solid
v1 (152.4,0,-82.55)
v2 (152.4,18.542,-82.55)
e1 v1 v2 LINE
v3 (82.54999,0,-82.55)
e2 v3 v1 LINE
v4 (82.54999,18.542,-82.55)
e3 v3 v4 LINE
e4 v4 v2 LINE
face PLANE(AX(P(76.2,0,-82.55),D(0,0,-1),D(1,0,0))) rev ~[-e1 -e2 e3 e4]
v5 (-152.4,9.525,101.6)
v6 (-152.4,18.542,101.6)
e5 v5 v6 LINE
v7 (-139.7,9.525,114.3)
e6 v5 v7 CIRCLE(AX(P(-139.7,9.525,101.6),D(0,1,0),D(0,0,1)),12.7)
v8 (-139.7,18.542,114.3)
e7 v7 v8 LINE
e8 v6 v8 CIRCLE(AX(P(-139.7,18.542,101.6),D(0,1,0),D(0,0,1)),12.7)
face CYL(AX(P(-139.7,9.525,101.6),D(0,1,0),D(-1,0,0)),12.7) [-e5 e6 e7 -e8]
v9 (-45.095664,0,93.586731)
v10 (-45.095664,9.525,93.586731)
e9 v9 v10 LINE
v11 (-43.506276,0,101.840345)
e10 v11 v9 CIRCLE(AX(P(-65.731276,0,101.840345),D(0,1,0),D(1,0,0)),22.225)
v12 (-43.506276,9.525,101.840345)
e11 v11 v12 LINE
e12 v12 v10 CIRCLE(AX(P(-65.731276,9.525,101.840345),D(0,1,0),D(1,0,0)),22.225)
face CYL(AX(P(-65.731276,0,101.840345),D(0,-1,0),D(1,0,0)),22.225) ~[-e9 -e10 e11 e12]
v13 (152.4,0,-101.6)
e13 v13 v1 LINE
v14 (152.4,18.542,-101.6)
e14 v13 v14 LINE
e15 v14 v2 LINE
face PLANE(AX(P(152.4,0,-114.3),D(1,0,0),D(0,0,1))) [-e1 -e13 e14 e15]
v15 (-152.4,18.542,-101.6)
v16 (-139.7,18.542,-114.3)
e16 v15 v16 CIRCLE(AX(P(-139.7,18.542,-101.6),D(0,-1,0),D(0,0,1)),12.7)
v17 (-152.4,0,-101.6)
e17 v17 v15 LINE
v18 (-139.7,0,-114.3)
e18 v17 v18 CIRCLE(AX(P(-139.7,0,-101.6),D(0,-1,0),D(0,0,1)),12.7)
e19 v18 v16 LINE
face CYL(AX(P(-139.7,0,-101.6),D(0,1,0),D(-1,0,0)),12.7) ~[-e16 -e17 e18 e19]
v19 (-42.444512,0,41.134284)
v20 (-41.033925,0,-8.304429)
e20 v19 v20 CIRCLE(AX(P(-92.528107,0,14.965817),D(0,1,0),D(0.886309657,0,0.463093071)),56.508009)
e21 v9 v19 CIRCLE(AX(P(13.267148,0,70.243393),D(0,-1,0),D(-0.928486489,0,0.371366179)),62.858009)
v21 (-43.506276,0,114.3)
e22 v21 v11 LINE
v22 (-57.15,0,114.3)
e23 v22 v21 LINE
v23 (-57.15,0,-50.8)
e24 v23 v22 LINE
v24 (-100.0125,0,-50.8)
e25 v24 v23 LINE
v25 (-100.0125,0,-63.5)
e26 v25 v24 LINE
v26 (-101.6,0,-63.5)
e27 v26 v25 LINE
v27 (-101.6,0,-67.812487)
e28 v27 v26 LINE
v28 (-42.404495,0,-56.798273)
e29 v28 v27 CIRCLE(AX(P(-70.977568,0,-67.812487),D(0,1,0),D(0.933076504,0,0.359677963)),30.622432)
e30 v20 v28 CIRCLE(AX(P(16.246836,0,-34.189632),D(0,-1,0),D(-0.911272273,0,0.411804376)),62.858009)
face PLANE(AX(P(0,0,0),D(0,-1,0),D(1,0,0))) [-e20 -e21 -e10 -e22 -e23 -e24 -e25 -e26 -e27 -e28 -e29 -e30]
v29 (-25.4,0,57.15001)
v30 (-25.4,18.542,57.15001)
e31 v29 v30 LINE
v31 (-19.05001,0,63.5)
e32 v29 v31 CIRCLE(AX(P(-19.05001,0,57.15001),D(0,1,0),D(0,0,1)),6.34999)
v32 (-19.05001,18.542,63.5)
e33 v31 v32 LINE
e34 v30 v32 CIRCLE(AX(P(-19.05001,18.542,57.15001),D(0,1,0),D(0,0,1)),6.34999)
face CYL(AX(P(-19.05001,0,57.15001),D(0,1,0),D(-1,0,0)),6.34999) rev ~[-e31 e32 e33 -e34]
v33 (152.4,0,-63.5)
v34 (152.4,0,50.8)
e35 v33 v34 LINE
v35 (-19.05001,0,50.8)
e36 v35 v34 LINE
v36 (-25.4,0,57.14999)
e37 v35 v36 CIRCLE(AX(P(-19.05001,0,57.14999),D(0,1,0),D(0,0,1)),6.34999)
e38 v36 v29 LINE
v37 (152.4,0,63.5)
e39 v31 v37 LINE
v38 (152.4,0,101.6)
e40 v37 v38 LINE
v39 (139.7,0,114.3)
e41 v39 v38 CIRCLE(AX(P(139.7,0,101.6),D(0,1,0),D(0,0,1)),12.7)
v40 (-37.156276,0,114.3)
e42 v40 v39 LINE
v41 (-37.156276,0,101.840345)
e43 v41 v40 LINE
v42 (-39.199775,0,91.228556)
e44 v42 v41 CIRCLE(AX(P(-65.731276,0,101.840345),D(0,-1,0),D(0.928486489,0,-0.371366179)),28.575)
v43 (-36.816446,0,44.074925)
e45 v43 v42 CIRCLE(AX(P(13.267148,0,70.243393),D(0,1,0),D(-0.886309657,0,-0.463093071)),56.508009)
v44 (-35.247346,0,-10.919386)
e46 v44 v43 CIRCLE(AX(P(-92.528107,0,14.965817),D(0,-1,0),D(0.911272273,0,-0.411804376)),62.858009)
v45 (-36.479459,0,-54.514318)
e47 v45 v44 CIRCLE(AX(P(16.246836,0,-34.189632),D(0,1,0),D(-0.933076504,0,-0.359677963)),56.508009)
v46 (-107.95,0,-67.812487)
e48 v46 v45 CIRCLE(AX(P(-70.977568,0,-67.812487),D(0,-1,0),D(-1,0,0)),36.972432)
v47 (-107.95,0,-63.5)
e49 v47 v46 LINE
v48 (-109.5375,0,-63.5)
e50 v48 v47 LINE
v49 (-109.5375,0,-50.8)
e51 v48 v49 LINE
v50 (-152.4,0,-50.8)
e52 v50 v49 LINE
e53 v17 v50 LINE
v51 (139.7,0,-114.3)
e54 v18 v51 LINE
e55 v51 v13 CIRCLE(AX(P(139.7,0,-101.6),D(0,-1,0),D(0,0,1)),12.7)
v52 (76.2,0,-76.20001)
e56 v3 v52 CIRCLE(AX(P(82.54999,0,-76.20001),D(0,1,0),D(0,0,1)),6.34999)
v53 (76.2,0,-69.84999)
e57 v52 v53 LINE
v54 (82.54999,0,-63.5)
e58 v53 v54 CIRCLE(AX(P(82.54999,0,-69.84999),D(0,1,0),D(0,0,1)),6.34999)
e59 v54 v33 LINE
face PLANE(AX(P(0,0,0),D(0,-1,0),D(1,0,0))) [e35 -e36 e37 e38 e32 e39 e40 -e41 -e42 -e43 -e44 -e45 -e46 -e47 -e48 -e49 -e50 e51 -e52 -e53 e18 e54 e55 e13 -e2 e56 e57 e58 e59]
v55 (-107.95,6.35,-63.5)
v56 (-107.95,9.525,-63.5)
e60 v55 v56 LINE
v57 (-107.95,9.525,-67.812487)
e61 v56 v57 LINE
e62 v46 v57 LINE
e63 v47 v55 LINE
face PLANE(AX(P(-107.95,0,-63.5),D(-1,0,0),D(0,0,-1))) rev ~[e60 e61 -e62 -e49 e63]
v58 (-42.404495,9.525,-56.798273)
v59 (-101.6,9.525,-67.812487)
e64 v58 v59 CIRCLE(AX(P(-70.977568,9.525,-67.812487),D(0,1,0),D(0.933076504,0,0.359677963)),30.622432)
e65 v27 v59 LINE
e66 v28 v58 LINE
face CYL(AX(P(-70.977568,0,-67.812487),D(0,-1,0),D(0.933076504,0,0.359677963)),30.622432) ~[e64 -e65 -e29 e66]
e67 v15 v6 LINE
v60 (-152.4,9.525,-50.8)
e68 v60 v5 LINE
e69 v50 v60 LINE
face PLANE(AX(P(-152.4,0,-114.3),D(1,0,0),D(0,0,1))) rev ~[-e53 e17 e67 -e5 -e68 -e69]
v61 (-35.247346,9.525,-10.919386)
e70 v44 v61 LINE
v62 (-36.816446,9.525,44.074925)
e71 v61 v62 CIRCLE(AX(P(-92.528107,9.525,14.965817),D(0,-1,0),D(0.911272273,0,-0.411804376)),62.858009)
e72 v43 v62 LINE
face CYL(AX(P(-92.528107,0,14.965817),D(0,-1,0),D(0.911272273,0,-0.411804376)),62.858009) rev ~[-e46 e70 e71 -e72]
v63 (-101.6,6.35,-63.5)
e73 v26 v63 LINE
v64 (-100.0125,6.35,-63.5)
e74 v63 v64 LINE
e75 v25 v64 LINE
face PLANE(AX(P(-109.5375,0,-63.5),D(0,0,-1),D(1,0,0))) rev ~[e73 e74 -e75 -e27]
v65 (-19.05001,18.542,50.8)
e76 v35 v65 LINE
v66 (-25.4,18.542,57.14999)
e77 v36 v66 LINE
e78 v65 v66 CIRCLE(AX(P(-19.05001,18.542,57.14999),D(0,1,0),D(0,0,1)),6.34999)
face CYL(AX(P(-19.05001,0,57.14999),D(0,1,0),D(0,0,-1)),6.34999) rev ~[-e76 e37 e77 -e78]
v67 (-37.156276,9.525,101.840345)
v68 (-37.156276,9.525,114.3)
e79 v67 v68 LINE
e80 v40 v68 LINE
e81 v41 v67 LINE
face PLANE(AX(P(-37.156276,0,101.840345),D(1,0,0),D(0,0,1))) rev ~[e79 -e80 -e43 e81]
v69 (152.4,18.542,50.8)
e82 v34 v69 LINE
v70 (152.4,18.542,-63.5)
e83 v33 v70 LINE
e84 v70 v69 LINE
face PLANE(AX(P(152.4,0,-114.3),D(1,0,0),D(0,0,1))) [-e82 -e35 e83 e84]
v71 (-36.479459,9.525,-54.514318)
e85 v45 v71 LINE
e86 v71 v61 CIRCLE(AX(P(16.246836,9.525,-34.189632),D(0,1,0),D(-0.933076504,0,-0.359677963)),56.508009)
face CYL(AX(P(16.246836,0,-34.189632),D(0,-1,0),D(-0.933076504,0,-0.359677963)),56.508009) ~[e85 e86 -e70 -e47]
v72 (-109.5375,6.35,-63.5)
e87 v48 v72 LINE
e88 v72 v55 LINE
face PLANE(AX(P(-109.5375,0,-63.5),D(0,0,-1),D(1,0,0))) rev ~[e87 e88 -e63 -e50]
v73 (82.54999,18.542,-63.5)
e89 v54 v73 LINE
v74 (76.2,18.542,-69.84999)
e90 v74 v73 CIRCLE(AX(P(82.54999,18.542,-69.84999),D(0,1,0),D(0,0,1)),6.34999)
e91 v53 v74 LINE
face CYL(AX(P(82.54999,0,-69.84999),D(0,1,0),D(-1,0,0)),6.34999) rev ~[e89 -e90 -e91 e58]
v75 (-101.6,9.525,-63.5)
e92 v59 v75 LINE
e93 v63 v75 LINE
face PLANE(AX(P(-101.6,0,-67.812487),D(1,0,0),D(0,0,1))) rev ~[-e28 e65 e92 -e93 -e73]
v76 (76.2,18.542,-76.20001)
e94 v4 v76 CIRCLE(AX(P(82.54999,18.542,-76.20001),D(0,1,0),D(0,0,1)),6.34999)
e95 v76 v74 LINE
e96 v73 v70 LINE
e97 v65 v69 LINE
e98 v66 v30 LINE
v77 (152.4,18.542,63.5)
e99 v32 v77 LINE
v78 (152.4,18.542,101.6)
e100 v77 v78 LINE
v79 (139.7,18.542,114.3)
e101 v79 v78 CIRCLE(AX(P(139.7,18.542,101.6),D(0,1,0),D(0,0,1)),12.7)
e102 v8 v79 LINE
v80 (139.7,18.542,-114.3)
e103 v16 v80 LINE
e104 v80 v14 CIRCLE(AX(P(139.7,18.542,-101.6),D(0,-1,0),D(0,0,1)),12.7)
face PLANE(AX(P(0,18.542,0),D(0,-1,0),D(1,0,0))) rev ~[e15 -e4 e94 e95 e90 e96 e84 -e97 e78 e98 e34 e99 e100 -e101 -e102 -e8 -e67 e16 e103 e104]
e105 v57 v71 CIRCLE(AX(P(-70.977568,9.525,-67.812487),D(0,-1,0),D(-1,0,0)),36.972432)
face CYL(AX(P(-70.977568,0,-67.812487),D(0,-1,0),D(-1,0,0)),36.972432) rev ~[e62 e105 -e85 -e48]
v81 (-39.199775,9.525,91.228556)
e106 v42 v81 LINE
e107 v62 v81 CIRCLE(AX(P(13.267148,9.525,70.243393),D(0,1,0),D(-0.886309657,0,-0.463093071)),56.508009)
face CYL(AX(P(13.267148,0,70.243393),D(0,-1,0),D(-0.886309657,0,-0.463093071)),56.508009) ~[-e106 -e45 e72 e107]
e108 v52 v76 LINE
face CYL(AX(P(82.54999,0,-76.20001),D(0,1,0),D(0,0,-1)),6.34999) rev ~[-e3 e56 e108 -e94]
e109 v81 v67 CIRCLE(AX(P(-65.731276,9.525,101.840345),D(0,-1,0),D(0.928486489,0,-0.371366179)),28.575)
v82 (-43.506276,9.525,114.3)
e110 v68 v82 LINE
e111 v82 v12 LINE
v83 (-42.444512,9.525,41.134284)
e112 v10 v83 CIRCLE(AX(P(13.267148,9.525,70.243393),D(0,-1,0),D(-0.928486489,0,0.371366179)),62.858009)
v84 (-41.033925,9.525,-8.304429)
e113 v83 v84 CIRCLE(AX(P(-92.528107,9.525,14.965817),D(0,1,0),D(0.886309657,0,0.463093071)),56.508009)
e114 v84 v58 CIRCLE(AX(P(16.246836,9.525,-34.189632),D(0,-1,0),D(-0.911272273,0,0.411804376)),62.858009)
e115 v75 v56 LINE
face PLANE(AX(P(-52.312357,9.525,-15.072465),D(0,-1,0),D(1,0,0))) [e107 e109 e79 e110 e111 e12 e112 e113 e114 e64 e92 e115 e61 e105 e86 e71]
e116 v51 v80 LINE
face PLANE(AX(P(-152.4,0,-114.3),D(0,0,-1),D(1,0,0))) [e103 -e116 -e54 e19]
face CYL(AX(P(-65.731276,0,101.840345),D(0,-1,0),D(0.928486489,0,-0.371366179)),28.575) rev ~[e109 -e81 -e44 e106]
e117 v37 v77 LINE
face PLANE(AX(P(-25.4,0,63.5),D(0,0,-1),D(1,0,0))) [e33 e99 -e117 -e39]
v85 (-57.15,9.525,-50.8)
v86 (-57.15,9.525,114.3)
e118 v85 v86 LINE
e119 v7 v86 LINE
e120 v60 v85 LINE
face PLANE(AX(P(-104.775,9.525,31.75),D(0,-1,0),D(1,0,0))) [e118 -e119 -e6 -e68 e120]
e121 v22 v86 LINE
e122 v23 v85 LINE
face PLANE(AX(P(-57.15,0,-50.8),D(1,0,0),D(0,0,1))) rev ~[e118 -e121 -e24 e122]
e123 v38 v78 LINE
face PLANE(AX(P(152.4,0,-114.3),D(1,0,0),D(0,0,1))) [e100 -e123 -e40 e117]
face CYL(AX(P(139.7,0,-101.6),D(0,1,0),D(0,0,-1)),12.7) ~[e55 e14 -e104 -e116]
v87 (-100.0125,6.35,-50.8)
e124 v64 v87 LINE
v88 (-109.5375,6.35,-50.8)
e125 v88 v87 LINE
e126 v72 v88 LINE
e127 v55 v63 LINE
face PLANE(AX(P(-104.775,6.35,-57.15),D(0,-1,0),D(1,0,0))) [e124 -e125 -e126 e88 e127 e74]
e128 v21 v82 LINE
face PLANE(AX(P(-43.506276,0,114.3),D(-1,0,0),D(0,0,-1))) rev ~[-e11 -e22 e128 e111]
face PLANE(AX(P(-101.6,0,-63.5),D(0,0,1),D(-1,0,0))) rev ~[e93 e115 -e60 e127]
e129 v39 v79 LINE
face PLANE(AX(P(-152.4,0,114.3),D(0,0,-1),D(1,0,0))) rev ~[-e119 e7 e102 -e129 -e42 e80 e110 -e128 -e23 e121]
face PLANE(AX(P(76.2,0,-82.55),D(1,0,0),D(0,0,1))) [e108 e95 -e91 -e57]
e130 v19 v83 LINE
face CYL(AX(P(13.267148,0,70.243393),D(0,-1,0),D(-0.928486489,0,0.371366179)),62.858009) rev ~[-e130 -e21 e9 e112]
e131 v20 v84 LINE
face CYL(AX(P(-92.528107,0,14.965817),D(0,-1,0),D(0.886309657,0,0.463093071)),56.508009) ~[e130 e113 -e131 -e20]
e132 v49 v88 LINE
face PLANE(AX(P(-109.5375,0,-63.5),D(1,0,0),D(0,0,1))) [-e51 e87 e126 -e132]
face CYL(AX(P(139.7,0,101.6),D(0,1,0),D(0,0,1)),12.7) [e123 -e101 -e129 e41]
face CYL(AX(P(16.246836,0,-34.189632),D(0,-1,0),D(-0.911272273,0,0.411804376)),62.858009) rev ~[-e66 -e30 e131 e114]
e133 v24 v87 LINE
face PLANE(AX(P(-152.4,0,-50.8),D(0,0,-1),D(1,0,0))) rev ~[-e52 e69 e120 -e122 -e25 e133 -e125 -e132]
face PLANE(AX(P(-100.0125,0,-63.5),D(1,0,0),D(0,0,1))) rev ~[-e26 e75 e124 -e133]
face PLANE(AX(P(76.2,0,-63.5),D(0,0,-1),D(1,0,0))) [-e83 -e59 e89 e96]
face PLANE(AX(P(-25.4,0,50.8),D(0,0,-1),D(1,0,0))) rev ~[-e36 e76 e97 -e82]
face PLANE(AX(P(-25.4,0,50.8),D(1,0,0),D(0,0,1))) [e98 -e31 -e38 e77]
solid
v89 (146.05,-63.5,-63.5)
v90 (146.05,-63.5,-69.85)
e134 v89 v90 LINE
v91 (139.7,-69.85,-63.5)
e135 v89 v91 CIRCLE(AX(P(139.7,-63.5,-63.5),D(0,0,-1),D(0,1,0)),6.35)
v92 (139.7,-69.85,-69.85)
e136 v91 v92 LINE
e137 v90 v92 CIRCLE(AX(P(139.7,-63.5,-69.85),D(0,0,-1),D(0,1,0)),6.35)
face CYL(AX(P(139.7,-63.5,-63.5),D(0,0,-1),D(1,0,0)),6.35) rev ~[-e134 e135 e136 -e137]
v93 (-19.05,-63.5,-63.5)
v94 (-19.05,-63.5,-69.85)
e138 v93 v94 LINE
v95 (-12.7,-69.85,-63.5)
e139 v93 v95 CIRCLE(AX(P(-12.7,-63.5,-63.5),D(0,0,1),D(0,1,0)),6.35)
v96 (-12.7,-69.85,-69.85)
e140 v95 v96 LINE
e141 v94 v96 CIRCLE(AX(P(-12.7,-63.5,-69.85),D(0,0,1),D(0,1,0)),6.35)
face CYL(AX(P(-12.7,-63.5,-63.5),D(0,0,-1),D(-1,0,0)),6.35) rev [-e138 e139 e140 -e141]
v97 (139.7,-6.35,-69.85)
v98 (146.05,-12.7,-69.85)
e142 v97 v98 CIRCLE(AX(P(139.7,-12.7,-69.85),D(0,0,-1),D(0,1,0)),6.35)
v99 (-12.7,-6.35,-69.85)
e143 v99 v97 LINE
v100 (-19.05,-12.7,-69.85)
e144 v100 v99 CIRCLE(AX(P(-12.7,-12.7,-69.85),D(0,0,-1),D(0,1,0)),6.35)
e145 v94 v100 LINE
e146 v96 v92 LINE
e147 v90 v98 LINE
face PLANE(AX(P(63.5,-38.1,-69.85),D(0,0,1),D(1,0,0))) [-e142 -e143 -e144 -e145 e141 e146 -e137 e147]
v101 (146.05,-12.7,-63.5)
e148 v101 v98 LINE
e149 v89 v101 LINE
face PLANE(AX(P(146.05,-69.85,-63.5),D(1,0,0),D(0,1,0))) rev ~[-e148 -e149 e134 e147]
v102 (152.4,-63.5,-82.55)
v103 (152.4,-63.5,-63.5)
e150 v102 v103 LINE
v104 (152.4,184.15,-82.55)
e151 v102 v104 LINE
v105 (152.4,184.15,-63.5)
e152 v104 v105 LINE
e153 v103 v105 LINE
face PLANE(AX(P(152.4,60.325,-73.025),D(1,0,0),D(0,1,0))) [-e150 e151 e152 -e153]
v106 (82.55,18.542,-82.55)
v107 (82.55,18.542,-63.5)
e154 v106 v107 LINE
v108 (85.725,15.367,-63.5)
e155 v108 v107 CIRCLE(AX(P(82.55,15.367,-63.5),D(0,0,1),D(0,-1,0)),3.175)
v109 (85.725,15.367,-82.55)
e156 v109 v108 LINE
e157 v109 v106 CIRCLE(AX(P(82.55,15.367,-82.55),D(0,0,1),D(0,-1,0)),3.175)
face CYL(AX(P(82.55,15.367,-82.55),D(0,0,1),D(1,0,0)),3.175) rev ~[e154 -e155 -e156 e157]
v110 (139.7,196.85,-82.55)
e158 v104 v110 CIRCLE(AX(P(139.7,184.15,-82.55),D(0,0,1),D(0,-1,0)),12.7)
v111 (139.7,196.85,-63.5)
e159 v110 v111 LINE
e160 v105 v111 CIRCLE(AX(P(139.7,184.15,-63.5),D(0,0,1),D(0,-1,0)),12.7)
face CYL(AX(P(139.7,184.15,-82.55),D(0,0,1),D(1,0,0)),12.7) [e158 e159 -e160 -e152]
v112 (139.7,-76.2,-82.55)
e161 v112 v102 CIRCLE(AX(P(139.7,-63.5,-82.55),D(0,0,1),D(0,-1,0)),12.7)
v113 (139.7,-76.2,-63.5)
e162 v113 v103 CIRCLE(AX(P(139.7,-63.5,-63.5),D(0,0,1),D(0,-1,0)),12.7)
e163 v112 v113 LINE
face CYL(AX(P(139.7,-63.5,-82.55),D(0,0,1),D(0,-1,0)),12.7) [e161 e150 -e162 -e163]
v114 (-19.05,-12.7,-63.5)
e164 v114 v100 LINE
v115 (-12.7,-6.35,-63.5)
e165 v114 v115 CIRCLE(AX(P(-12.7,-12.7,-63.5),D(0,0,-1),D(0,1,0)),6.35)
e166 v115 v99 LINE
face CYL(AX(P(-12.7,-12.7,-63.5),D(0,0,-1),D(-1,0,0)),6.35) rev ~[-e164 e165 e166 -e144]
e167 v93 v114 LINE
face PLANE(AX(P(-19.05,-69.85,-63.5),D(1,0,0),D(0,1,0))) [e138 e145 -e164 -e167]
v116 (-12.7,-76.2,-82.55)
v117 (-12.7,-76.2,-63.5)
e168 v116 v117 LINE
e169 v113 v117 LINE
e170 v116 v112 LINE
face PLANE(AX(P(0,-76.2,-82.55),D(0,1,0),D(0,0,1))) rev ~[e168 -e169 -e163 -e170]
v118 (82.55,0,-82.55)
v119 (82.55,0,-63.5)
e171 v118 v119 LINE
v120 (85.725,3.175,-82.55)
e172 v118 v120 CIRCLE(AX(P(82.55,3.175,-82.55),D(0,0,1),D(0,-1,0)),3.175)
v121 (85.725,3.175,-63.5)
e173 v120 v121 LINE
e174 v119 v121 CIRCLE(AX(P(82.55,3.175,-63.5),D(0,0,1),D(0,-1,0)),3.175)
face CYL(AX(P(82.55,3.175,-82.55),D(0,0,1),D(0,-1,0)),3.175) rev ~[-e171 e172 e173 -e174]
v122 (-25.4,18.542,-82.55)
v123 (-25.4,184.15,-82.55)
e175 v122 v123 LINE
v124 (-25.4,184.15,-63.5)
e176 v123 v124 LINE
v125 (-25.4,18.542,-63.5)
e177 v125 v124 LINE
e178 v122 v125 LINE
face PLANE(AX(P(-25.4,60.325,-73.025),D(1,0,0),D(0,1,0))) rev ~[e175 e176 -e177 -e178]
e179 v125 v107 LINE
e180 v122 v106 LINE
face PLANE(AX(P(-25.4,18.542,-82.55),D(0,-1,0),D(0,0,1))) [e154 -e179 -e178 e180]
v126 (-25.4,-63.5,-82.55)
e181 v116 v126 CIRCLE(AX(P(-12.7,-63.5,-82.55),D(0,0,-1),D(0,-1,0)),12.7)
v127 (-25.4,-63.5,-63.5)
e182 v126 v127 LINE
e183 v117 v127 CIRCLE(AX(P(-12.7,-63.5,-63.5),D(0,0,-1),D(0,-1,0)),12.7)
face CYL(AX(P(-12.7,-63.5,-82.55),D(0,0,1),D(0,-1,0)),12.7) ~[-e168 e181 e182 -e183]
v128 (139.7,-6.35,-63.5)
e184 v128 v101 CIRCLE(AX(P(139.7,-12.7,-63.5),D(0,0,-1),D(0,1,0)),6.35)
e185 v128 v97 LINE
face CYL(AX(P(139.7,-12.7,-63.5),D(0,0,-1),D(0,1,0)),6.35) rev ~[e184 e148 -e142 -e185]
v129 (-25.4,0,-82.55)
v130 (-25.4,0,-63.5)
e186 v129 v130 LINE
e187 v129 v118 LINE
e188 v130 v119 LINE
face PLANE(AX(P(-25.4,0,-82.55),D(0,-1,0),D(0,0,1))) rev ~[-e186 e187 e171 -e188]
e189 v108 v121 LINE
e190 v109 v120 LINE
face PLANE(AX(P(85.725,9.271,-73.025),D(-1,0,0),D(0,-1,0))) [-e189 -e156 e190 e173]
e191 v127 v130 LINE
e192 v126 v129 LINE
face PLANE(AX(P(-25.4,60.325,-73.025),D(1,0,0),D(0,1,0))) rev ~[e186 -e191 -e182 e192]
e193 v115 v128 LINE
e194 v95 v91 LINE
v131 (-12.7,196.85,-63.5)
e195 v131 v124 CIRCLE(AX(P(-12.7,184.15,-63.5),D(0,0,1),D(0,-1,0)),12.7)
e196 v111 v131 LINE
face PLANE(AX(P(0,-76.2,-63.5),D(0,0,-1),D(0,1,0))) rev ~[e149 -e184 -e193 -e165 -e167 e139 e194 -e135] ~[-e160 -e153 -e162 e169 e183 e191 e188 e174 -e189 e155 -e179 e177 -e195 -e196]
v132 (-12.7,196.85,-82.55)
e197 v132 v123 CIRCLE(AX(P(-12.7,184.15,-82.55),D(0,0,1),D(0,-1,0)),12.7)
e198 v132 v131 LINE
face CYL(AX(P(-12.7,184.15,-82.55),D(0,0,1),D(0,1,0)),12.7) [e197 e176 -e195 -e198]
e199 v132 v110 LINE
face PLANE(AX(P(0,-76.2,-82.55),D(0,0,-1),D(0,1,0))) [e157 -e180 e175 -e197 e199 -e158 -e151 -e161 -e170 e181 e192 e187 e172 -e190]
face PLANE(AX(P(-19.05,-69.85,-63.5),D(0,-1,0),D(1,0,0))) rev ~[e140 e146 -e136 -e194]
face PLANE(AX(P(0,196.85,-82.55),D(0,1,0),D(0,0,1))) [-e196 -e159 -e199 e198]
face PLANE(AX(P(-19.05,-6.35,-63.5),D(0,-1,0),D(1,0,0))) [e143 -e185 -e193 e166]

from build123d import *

# Parameters (mm, degrees)
F0_W           = 304.8
F0_H           = 228.6
F1_DEPTH       = 18.542
F2_W           = 177.8
F2_H           = 12.7
F2_W_2         = 76.2
F2_H_2         = 19.05
F3_DEPTH       = 18.543
F4_W           = 95.25
F4_H           = 165.1
F5_DEPTH       = 9.525
F6_W           = 9.525
F6_H           = 12.7
F7_DEPTH       = 6.35
F9_DEPTH       = 9.525
F10_R          = 12.7
F11_R          = 6.34999
F12_W          = 273.05
F12_H          = 19.05
F13_DEPTH      = 152.4
F13_DEPTH_BACK = 25.4
F14_W          = 18.542
F14_H          = 19.05
F15_DEPTH      = 111.125
F16_R          = 12.7
F17_R          = 3.175
F18_W          = 165.1
F18_H          = 63.5
F19_DEPTH      = 6.35
F20_R          = 6.35


# Not quite as in the source:
# - a fillet or chamfer is up to 0.001 mm smaller than in the source, because OpenCascade refuses the exact size


with BuildPart() as f1:
    # F0 (on Front) → F1 (new body)
    with BuildSketch(Plane.XZ):
        Rectangle(F0_W, F0_H)
    extrude(amount=-F1_DEPTH)

    # F2 (on face) → F3 (cut, through all)
    with BuildSketch(Plane.XZ):
        with Locations((63.5, 57.15)):
            Rectangle(F2_W, F2_H)
        with Locations((114.3, -73.025)):
            Rectangle(F2_W_2, F2_H_2)
    extrude(amount=-F3_DEPTH, mode=Mode.SUBTRACT)

    # F4 (on face) → F5 (cut)
    with BuildSketch(Plane.XZ):
        with Locations((-104.775, 31.75)):
            Rectangle(F4_W, F4_H)
    extrude(amount=-F5_DEPTH, mode=Mode.SUBTRACT)

    # F6 (on face) → F7 (cut)
    with BuildSketch(Plane.XZ):
        with Locations((-104.775, -57.15)):
            Rectangle(F6_W, F6_H)
    extrude(amount=-F7_DEPTH, mode=Mode.SUBTRACT)

    # F8 (on face) → F9 (cut)
    with BuildSketch(Plane.XZ):
        with BuildLine():
            ThreePointArc((-39.1997749684, 91.2285561772), (-37.6718013693, 96.4369674893), (-37.1562764049, 101.8403447412))
            Line((-37.1562764049, 101.8403447412), (-37.1562764049, 114.3))
            Line((-37.1562764049, 114.3), (-43.5062764049, 114.3))
            Line((-43.5062764049, 114.3), (-43.5062764049, 101.8403447412))
            ThreePointArc((-43.5062764049, 101.8403447412), (-43.9072402661, 97.6377179897), (-45.0956641765, 93.5867314137))
            ThreePointArc((-45.0956641765, 93.5867314137), (-49.5107233258, 67.0703536947), (-42.4445124385, 41.1342842484))
            ThreePointArc((-42.4445124385, 41.1342842484), (-36.0430844049, 16.5774501543), (-41.0339246807, -8.3044286924))
            ThreePointArc((-41.0339246807, -8.3044286924), (-46.586082977, -32.4137993186), (-42.4044952455, -56.7982726117))
            ThreePointArc((-42.4044952455, -56.7982726117), (-65.3759429594, -97.9182199908), (-101.6, -67.8124867486))
            Line((-101.6, -67.8124867486), (-101.6, -63.5))
            Line((-101.6, -63.5), (-107.95, -63.5))
            Line((-107.95, -63.5), (-107.95, -67.8124867486))
            ThreePointArc((-107.95, -67.8124867486), (-64.2143658736, -104.1610750006), (-36.4794594428, -54.5143175474))
            ThreePointArc((-36.4794594428, -54.5143175474), (-40.2386175991, -32.5931962998), (-35.2473457461, -10.9193864805))
            ThreePointArc((-35.2473457461, -10.9193864805), (-29.6956675249, 16.7585549608), (-36.8164461183, 44.0749252491))
            ThreePointArc((-36.8164461183, 44.0749252491), (-43.1688189483, 67.3908983351), (-39.1997749684, 91.2285561772))
        make_face()
    extrude(amount=-F9_DEPTH, mode=Mode.SUBTRACT)

    # F10
    f10_edges = [f1.edges().sort_by_distance(p)[0] for p in [
        (152.4, 9.271, 114.3),
        (152.4, 9.271, -114.3),
        (-152.4, 14.0335, 114.3),
        (-152.4, 9.271, -114.3),
    ]]
    fillet(f10_edges, radius=F10_R)

    # F11 (radius 6.35 in the source; OpenCascade refuses exactly that, so slightly less here)
    f11_edges = [f1.edges().sort_by_distance(p)[0] for p in [
        (-25.4, 9.271, 63.5),
        (-25.4, 9.271, 50.8),
        (76.2, 9.271, -82.55),
        (76.2, 9.271, -63.5),
    ]]
    fillet(f11_edges, radius=F11_R)


with BuildPart() as f13:
    # F12 (on Right) → F13 (new body, two sides)
    with BuildSketch(Plane.YZ) as f13_sk:
        with Locations((60.325, -73.025)):
            Rectangle(F12_W, F12_H)
    extrude(amount=F13_DEPTH)
    extrude(f13_sk.sketch, amount=-F13_DEPTH_BACK)

    # F14 (on face) → F15 (cut)
    with BuildSketch(Plane(origin=(-25.4, 0, 0), x_dir=(0, -1, 0), z_dir=(-1, 0, 0))):
        with Locations((-9.271, -73.025)):
            Rectangle(F14_W, F14_H)
    extrude(amount=-F15_DEPTH, mode=Mode.SUBTRACT)

    # F16
    f16_edges = [f13.edges().sort_by_distance(p)[0] for p in [
        (-25.4, -76.2, -73.025),
        (152.4, -76.2, -73.025),
        (152.4, 196.85, -73.025),
        (-25.4, 196.85, -73.025),
    ]]
    fillet(f16_edges, radius=F16_R)

    # F17
    f17_edges = [f13.edges().sort_by_distance(p)[0] for p in [
        (85.725, 18.542, -73.025),
        (85.725, 0, -73.025),
    ]]
    fillet(f17_edges, radius=F17_R)

    # F18 (on face) → F19 (cut)
    with BuildSketch(Plane.XY.offset(-63.5)):
        with Locations((63.5, -38.1)):
            Rectangle(F18_W, F18_H)
    extrude(amount=-F19_DEPTH, mode=Mode.SUBTRACT)

    # F20
    f20_edges = [f13.edges().sort_by_distance(p)[0] for p in [
        (-19.05, -69.85, -66.675),
        (-19.05, -6.35, -66.675),
        (146.05, -6.35, -66.675),
        (146.05, -69.85, -66.675),
    ]]
    fillet(f20_edges, radius=F20_R)


solid = Compound([f1.part, f13.part])
